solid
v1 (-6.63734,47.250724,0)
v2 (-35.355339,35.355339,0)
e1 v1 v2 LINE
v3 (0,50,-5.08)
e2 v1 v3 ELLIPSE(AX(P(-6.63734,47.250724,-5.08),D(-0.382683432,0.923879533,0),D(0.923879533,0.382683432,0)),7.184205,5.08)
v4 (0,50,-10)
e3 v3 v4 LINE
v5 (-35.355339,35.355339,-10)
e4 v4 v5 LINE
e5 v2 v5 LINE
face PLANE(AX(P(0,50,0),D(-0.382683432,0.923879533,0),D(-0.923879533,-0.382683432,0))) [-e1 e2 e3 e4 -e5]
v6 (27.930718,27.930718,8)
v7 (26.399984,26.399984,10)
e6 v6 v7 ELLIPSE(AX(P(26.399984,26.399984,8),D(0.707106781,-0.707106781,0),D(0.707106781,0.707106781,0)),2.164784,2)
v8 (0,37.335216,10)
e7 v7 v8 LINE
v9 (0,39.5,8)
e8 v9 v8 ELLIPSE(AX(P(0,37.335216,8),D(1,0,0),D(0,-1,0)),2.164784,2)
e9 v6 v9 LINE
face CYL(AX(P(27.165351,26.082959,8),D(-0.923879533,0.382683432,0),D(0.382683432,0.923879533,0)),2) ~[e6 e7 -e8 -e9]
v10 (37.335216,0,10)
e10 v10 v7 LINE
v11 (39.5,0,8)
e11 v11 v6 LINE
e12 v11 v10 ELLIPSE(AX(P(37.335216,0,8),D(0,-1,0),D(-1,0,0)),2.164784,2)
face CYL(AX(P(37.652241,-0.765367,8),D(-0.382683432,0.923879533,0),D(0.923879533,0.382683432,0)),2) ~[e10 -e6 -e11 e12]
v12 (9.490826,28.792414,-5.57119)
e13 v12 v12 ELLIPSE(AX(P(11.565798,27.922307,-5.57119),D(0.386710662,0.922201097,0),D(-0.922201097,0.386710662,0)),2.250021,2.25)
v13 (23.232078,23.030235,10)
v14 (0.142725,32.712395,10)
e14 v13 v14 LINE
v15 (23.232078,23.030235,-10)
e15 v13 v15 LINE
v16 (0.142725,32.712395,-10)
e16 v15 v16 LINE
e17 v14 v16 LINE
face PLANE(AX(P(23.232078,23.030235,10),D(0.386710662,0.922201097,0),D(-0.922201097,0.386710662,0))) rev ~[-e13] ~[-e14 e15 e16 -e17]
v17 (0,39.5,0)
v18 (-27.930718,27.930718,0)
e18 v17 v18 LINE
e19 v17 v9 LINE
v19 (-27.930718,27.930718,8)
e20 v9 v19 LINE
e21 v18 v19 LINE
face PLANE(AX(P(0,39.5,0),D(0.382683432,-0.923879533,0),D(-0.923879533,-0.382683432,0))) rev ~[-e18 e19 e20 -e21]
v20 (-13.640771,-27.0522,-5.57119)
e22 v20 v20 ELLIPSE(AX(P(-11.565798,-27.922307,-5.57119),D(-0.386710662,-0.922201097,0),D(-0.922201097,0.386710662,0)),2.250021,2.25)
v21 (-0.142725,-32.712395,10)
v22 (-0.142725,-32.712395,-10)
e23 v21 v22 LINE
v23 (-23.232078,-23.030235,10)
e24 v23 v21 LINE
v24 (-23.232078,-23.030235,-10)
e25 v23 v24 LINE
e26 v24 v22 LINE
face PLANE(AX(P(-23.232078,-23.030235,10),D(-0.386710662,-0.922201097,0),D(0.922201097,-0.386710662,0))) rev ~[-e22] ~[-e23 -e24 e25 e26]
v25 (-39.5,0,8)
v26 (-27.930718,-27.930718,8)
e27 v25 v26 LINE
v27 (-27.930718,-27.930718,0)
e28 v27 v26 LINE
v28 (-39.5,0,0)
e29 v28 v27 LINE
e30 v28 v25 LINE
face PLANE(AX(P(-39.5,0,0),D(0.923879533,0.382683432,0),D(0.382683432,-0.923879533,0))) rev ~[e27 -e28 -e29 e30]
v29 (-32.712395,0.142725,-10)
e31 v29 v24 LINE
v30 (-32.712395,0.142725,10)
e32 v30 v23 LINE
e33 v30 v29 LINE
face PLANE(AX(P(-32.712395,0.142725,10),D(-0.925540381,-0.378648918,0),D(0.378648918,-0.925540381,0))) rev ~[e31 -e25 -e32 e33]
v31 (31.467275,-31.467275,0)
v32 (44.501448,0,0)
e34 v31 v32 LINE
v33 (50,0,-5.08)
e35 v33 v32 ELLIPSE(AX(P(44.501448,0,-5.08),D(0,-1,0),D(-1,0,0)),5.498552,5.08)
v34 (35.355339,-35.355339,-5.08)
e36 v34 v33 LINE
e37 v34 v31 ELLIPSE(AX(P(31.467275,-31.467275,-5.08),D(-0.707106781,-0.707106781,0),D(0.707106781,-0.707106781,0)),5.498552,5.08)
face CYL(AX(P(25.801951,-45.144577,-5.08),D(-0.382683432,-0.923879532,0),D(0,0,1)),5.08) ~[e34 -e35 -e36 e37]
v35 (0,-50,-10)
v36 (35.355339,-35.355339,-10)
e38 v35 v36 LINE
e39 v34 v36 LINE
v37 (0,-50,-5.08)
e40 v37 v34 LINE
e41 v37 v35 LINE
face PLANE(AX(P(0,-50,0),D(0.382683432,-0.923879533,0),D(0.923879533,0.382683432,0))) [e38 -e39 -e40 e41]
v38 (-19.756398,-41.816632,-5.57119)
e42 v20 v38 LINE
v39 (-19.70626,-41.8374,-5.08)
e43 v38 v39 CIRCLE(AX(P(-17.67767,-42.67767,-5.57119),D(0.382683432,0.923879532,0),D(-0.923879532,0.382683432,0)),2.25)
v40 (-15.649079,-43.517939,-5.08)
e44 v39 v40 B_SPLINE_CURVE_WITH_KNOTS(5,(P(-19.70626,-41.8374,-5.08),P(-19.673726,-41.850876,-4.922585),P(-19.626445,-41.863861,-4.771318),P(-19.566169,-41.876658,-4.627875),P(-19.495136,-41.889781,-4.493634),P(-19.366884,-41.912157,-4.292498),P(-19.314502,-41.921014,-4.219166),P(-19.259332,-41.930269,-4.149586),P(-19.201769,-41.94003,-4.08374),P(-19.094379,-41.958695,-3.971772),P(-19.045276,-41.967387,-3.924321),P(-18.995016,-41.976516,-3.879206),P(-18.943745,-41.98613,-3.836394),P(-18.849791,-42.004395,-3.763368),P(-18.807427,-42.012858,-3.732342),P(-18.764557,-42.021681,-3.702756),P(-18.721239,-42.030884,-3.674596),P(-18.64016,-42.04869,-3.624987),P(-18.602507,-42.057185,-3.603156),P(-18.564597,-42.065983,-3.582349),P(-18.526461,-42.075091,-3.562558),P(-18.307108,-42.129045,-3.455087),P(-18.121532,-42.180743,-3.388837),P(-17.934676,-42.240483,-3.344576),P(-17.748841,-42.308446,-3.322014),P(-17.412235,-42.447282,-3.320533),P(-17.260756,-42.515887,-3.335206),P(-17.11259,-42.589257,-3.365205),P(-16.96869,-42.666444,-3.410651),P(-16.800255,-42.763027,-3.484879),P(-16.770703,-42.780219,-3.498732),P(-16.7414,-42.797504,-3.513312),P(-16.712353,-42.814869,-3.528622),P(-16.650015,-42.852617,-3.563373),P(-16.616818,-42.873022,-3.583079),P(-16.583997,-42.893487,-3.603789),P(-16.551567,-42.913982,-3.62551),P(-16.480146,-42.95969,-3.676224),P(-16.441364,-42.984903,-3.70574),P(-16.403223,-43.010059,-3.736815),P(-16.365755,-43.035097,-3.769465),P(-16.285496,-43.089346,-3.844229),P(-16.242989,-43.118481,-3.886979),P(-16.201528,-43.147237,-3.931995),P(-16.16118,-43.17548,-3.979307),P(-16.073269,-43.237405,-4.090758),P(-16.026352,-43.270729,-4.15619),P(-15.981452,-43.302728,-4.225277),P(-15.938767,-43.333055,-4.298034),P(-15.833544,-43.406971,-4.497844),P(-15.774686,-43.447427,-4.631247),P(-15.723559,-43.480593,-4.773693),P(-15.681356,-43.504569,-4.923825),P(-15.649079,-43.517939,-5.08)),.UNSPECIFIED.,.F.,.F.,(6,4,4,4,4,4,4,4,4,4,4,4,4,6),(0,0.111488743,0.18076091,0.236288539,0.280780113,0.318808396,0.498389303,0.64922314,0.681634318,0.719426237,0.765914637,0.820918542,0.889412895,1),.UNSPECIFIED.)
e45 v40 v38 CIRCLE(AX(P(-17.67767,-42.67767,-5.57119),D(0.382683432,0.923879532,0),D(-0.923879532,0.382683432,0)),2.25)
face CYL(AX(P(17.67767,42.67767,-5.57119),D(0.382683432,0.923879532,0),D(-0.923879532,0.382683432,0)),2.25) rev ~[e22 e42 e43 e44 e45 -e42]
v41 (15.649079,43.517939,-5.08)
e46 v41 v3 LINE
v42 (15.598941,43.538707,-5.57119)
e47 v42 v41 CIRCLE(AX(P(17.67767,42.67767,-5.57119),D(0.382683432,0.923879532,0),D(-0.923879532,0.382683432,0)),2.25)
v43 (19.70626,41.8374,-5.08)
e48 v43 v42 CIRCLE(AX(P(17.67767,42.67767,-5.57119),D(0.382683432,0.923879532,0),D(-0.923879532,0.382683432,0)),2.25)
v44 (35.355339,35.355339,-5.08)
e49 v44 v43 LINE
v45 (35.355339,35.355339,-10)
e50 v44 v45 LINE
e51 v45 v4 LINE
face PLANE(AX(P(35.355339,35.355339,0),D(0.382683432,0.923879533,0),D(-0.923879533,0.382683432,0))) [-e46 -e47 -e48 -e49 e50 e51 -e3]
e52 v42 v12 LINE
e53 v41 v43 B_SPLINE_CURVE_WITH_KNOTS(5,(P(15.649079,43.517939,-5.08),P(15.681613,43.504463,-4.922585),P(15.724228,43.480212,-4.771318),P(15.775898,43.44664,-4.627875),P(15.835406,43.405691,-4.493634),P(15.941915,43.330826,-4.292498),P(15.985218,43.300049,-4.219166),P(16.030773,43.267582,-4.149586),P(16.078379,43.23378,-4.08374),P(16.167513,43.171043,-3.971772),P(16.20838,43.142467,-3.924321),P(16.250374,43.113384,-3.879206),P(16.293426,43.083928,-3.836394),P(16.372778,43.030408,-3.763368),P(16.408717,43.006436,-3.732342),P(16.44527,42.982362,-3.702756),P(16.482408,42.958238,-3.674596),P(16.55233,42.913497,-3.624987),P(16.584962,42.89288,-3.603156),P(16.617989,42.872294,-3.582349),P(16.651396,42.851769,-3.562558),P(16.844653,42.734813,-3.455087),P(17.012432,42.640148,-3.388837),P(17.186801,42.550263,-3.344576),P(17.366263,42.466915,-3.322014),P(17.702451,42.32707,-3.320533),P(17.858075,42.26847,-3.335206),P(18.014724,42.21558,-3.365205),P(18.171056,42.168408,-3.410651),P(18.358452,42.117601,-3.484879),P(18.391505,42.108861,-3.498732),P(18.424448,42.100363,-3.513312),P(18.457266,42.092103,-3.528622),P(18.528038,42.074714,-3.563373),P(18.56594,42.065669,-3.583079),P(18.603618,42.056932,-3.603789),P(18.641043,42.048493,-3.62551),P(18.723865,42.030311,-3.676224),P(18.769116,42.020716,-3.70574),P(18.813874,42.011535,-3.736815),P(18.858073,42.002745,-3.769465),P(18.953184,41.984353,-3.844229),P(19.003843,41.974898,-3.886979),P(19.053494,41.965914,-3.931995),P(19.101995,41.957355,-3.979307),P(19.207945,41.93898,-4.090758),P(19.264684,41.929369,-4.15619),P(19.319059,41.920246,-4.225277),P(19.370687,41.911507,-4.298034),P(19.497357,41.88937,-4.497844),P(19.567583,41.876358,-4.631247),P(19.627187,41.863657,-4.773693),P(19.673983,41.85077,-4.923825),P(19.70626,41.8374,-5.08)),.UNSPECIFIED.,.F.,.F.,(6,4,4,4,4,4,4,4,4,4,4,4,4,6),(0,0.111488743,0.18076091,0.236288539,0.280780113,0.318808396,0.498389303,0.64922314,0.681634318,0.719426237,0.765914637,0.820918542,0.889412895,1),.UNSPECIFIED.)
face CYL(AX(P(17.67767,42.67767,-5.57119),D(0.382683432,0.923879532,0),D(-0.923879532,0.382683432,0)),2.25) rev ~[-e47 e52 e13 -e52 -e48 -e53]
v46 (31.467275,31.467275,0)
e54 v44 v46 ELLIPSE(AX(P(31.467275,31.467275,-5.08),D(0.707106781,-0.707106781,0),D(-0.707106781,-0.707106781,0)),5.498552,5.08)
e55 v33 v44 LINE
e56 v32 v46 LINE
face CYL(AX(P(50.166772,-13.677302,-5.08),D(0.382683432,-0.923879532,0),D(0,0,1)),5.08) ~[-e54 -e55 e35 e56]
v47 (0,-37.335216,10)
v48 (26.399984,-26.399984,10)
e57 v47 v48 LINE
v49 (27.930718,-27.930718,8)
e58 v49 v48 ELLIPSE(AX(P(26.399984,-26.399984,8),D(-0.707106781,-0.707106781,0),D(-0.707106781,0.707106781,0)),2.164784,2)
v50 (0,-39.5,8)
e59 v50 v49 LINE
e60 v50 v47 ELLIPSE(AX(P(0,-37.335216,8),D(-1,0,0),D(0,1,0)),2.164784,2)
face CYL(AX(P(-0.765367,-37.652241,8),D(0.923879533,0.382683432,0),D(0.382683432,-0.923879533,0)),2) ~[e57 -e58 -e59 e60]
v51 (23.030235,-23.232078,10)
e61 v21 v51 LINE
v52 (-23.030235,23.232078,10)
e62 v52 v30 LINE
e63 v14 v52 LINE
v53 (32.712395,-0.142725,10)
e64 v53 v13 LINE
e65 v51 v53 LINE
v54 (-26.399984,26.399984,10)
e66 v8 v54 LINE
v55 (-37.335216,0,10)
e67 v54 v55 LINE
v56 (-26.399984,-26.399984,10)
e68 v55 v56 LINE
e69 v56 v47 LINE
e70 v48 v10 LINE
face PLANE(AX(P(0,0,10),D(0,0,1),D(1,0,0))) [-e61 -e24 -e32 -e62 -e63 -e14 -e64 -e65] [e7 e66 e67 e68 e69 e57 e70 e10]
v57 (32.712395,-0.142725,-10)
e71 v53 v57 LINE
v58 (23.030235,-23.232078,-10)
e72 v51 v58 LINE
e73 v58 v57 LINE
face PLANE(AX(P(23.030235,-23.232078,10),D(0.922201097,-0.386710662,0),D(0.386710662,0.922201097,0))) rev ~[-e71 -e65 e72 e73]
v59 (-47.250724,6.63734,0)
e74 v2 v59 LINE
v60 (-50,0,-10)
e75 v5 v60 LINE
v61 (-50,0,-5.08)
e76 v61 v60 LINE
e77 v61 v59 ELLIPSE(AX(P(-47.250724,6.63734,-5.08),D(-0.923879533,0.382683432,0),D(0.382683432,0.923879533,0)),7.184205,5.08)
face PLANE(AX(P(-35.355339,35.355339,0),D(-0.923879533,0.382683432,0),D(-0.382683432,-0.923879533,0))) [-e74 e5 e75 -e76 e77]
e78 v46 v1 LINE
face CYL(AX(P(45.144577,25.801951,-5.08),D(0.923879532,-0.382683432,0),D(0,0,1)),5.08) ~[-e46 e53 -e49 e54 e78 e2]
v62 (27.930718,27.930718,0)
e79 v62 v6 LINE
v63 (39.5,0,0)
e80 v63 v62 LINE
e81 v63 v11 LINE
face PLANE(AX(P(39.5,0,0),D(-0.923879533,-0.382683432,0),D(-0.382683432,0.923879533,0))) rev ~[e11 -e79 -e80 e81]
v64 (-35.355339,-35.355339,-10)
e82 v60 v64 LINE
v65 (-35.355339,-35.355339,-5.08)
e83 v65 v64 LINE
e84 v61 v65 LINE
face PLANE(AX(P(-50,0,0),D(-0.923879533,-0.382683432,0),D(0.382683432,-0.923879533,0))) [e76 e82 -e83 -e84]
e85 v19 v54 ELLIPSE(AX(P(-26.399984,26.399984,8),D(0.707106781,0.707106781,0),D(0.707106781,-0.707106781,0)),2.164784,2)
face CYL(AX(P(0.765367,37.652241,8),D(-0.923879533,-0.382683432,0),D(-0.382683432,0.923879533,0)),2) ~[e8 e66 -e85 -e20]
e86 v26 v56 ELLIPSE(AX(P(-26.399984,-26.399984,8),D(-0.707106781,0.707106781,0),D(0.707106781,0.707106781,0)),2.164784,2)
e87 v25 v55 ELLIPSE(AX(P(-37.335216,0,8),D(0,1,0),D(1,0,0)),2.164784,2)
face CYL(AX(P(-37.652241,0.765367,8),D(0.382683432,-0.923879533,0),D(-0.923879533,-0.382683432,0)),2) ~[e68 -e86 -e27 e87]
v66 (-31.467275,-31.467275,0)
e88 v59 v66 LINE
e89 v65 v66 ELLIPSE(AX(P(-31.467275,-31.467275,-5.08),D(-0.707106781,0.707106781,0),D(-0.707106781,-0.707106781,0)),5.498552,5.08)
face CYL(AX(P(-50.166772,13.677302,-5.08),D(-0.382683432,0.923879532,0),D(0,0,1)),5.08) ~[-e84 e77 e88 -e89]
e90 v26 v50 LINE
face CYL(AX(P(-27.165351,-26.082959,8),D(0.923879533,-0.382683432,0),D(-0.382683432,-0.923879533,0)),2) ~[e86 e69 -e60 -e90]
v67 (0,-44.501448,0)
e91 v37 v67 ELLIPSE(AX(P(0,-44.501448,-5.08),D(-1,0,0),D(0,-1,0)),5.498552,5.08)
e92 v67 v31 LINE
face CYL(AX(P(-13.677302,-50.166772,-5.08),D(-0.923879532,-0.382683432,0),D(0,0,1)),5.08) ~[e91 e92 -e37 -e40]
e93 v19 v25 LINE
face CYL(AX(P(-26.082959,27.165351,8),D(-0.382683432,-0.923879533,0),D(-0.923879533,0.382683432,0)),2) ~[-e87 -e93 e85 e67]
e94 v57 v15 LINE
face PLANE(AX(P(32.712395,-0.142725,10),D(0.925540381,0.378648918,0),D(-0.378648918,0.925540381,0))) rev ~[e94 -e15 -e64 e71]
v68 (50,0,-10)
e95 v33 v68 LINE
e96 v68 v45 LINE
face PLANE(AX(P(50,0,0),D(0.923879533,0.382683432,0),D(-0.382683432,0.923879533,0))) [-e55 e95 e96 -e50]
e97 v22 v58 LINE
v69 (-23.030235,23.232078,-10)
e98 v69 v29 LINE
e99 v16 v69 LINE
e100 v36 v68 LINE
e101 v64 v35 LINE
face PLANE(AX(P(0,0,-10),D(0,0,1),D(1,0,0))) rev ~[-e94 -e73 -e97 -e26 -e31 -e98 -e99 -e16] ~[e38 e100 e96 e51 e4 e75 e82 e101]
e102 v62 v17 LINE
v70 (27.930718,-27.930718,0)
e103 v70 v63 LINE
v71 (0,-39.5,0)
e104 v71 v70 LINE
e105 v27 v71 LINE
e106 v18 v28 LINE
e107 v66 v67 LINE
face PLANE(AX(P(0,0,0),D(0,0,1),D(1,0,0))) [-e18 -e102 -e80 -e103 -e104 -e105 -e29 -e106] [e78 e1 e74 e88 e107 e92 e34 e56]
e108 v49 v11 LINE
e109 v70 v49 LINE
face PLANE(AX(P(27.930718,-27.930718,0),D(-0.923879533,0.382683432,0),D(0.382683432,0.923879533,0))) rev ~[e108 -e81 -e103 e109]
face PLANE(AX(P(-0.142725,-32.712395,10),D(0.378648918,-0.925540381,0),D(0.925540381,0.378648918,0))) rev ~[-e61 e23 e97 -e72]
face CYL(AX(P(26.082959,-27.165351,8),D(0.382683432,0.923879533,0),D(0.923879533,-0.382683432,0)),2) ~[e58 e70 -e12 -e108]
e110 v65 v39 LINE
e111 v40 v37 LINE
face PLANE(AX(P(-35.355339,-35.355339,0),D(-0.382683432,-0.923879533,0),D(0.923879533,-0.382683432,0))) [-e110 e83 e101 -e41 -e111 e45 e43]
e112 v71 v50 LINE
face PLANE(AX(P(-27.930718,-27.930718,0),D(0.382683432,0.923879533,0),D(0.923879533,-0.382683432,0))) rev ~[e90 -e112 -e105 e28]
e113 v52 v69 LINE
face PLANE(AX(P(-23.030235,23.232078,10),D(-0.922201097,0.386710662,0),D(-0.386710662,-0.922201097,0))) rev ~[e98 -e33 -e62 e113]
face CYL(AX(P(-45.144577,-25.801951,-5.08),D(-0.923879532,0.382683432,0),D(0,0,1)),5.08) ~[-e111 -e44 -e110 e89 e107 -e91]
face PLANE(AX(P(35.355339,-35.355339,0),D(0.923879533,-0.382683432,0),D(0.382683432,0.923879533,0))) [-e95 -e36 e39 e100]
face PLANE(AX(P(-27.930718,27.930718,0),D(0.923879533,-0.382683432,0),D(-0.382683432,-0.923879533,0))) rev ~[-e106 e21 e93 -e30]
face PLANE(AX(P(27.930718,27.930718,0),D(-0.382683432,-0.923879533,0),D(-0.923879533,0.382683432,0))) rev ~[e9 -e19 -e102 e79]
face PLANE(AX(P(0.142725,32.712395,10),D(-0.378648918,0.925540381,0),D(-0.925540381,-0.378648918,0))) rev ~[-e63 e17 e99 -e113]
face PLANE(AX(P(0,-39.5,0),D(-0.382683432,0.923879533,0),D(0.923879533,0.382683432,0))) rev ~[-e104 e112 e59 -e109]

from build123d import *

# Parameters (mm, degrees)
F1_DEPTH     = 10
F3_DEPTH     = 10
F5_DEPTH     = 23.6474
F6_R         = 2.25
F7_DEPTH     = 107.696
F8_R         = 2
F9_T1_DEPTH  = 63.6683432365
F9_T3_DEPTH  = 63.6683432365
F9_T5_DEPTH  = 63.6683432365
F9_T7_DEPTH  = 63.6683432365
F9_T9_DEPTH  = 63.6683432365
F9_T11_DEPTH = 63.6683432365


# Not quite as in the source:
# - a fillet or chamfer that OpenCascade refuses, or shapes differently, is made with other operations: its cross-section is extruded or revolved along the edge and cut away or added


with BuildPart() as f1:
    # F0 (on Top) → F1 (new body)
    with BuildSketch(Plane.XY):
        Polygon((50, 0), (35.3553390593, 35.3553390593), (0, 50), (-35.3553390593, 35.3553390593), (-50, 0), (-35.3553390593, -35.3553390593), (0, -50), (35.3553390593, -35.3553390593), align=None)
    extrude(amount=-F1_DEPTH)

    # F2 (on face) → F3 (join)
    with BuildSketch(Plane.XY):
        Polygon((-27.9307178569, -27.9307178569), (0, -39.5), (27.9307178569, -27.9307178569), (39.5, 0), (27.9307178569, 27.9307178569), (0, 39.5), (-27.9307178569, 27.9307178569), (-39.5, 0), align=None)
    extrude(amount=F3_DEPTH)

    # F4 (on face) → F5 (cut)
    with BuildSketch(Plane.XY.offset(10)):
        Polygon((-32.7123950097, 0.1427250341), (-23.2320781797, -23.0302345008), (-0.1427250341, -32.7123950097), (23.0302345008, -23.2320781797), (32.7123950097, -0.1427250341), (23.2320781797, 23.0302345008), (0.1427250341, 32.7123950097), (-23.0302345008, 23.2320781797), align=None)
    extrude(amount=-F5_DEPTH, mode=Mode.SUBTRACT)

    # F6 (on face) → F7 (cut)
    with BuildSketch(Plane(origin=(17.6776695297, 42.6776695297, 0), x_dir=(-0.9238795325, 0.3826834324, 0), z_dir=(0.3826834324, 0.9238795325, 0))):
        with Locations((0, -5.5711902678)):
            Circle(F6_R)
    extrude(amount=-F7_DEPTH, mode=Mode.SUBTRACT)

    # F8
    f8_edges = [f1.edges().sort_by_distance(p)[0] for p in [
        (33.715359, 13.965359, 10),
        (33.715359, -13.965359, 10),
        (13.965359, -33.715359, 10),
        (-13.965359, -33.715359, 10),
        (-33.715359, -13.965359, 10),
        (-33.715359, 13.965359, 10),
        (-13.965359, 33.715359, 10),
        (13.965359, 33.715359, 10),
    ]]
    fillet(f8_edges, radius=F8_R)

    # F9: fillet of radius 5.08 on 6 edges, made by hand

    # F9_s2 → F9_t1 (cut)
    with BuildSketch(Plane(origin=(-12.1824100614, -29.4109395926, 0), x_dir=(0, 0, 1), z_dir=(0.3826834324, 0.9238795325, 0))):
        with BuildLine():
            ThreePointArc((0, 41.1139766256), (-1.4878975516, 44.706079074), (-5.08, 46.1939766256))
            Line((-5.08, 46.1939766256), (0, 46.1939766256))
            Line((0, 46.1939766256), (0, 41.1139766256))
        make_face()
    extrude(amount=F9_T1_DEPTH, mode=Mode.SUBTRACT)

    # F9_s4 → F9_t3 (cut)
    with BuildSketch(Plane(origin=(-29.4109395926, -12.1824100614, 0), x_dir=(0, 0, 1), z_dir=(0.9238795325, 0.3826834324, 0))):
        with BuildLine():
            ThreePointArc((0, 41.1139766256), (-1.4878975516, 44.706079074), (-5.08, 46.1939766256))
            Line((-5.08, 46.1939766256), (0, 46.1939766256))
            Line((0, 46.1939766256), (0, 41.1139766256))
        make_face()
    extrude(amount=F9_T3_DEPTH, mode=Mode.SUBTRACT)

    # F9_s6 → F9_t5 (cut)
    with BuildSketch(Plane(origin=(-29.4109395926, 12.1824100614, 0), x_dir=(0, 0, 1), z_dir=(0.9238795325, -0.3826834324, 0))):
        with BuildLine():
            ThreePointArc((0, 41.1139766256), (-1.4878975516, 44.706079074), (-5.08, 46.1939766256))
            Line((-5.08, 46.1939766256), (0, 46.1939766256))
            Line((0, 46.1939766256), (0, 41.1139766256))
        make_face()
    extrude(amount=F9_T5_DEPTH, mode=Mode.SUBTRACT)

    # F9_s8 → F9_t7 (cut)
    with BuildSketch(Plane(origin=(12.1824100614, -29.4109395926, 0), x_dir=(0, 0, 1), z_dir=(-0.3826834324, 0.9238795325, 0))):
        with BuildLine():
            ThreePointArc((0, 41.1139766256), (-1.4878975516, 44.706079074), (-5.08, 46.1939766256))
            Line((-5.08, 46.1939766256), (0, 46.1939766256))
            Line((0, 46.1939766256), (0, 41.1139766256))
        make_face()
    extrude(amount=F9_T7_DEPTH, mode=Mode.SUBTRACT)

    # F9_s10 → F9_t9 (cut)
    with BuildSketch(Plane(origin=(-12.1824100614, 29.4109395926, 0), x_dir=(0, 0, 1), z_dir=(0.3826834324, -0.9238795325, 0))):
        with BuildLine():
            ThreePointArc((0, 41.1139766256), (-1.4878975516, 44.706079074), (-5.08, 46.1939766256))
            Line((-5.08, 46.1939766256), (0, 46.1939766256))
            Line((0, 46.1939766256), (0, 41.1139766256))
        make_face()
    extrude(amount=F9_T9_DEPTH, mode=Mode.SUBTRACT)

    # F9_s12 → F9_t11 (cut)
    with BuildSketch(Plane(origin=(29.4109395926, -12.1824100614, 0), x_dir=(0, 0, 1), z_dir=(-0.9238795325, 0.3826834324, 0))):
        with BuildLine():
            ThreePointArc((0, 41.1139766256), (-1.4878975516, 44.706079074), (-5.08, 46.1939766256))
            Line((-5.08, 46.1939766256), (0, 46.1939766256))
            Line((0, 46.1939766256), (0, 41.1139766256))
        make_face()
    extrude(amount=F9_T11_DEPTH, mode=Mode.SUBTRACT)


solid = f1.part
